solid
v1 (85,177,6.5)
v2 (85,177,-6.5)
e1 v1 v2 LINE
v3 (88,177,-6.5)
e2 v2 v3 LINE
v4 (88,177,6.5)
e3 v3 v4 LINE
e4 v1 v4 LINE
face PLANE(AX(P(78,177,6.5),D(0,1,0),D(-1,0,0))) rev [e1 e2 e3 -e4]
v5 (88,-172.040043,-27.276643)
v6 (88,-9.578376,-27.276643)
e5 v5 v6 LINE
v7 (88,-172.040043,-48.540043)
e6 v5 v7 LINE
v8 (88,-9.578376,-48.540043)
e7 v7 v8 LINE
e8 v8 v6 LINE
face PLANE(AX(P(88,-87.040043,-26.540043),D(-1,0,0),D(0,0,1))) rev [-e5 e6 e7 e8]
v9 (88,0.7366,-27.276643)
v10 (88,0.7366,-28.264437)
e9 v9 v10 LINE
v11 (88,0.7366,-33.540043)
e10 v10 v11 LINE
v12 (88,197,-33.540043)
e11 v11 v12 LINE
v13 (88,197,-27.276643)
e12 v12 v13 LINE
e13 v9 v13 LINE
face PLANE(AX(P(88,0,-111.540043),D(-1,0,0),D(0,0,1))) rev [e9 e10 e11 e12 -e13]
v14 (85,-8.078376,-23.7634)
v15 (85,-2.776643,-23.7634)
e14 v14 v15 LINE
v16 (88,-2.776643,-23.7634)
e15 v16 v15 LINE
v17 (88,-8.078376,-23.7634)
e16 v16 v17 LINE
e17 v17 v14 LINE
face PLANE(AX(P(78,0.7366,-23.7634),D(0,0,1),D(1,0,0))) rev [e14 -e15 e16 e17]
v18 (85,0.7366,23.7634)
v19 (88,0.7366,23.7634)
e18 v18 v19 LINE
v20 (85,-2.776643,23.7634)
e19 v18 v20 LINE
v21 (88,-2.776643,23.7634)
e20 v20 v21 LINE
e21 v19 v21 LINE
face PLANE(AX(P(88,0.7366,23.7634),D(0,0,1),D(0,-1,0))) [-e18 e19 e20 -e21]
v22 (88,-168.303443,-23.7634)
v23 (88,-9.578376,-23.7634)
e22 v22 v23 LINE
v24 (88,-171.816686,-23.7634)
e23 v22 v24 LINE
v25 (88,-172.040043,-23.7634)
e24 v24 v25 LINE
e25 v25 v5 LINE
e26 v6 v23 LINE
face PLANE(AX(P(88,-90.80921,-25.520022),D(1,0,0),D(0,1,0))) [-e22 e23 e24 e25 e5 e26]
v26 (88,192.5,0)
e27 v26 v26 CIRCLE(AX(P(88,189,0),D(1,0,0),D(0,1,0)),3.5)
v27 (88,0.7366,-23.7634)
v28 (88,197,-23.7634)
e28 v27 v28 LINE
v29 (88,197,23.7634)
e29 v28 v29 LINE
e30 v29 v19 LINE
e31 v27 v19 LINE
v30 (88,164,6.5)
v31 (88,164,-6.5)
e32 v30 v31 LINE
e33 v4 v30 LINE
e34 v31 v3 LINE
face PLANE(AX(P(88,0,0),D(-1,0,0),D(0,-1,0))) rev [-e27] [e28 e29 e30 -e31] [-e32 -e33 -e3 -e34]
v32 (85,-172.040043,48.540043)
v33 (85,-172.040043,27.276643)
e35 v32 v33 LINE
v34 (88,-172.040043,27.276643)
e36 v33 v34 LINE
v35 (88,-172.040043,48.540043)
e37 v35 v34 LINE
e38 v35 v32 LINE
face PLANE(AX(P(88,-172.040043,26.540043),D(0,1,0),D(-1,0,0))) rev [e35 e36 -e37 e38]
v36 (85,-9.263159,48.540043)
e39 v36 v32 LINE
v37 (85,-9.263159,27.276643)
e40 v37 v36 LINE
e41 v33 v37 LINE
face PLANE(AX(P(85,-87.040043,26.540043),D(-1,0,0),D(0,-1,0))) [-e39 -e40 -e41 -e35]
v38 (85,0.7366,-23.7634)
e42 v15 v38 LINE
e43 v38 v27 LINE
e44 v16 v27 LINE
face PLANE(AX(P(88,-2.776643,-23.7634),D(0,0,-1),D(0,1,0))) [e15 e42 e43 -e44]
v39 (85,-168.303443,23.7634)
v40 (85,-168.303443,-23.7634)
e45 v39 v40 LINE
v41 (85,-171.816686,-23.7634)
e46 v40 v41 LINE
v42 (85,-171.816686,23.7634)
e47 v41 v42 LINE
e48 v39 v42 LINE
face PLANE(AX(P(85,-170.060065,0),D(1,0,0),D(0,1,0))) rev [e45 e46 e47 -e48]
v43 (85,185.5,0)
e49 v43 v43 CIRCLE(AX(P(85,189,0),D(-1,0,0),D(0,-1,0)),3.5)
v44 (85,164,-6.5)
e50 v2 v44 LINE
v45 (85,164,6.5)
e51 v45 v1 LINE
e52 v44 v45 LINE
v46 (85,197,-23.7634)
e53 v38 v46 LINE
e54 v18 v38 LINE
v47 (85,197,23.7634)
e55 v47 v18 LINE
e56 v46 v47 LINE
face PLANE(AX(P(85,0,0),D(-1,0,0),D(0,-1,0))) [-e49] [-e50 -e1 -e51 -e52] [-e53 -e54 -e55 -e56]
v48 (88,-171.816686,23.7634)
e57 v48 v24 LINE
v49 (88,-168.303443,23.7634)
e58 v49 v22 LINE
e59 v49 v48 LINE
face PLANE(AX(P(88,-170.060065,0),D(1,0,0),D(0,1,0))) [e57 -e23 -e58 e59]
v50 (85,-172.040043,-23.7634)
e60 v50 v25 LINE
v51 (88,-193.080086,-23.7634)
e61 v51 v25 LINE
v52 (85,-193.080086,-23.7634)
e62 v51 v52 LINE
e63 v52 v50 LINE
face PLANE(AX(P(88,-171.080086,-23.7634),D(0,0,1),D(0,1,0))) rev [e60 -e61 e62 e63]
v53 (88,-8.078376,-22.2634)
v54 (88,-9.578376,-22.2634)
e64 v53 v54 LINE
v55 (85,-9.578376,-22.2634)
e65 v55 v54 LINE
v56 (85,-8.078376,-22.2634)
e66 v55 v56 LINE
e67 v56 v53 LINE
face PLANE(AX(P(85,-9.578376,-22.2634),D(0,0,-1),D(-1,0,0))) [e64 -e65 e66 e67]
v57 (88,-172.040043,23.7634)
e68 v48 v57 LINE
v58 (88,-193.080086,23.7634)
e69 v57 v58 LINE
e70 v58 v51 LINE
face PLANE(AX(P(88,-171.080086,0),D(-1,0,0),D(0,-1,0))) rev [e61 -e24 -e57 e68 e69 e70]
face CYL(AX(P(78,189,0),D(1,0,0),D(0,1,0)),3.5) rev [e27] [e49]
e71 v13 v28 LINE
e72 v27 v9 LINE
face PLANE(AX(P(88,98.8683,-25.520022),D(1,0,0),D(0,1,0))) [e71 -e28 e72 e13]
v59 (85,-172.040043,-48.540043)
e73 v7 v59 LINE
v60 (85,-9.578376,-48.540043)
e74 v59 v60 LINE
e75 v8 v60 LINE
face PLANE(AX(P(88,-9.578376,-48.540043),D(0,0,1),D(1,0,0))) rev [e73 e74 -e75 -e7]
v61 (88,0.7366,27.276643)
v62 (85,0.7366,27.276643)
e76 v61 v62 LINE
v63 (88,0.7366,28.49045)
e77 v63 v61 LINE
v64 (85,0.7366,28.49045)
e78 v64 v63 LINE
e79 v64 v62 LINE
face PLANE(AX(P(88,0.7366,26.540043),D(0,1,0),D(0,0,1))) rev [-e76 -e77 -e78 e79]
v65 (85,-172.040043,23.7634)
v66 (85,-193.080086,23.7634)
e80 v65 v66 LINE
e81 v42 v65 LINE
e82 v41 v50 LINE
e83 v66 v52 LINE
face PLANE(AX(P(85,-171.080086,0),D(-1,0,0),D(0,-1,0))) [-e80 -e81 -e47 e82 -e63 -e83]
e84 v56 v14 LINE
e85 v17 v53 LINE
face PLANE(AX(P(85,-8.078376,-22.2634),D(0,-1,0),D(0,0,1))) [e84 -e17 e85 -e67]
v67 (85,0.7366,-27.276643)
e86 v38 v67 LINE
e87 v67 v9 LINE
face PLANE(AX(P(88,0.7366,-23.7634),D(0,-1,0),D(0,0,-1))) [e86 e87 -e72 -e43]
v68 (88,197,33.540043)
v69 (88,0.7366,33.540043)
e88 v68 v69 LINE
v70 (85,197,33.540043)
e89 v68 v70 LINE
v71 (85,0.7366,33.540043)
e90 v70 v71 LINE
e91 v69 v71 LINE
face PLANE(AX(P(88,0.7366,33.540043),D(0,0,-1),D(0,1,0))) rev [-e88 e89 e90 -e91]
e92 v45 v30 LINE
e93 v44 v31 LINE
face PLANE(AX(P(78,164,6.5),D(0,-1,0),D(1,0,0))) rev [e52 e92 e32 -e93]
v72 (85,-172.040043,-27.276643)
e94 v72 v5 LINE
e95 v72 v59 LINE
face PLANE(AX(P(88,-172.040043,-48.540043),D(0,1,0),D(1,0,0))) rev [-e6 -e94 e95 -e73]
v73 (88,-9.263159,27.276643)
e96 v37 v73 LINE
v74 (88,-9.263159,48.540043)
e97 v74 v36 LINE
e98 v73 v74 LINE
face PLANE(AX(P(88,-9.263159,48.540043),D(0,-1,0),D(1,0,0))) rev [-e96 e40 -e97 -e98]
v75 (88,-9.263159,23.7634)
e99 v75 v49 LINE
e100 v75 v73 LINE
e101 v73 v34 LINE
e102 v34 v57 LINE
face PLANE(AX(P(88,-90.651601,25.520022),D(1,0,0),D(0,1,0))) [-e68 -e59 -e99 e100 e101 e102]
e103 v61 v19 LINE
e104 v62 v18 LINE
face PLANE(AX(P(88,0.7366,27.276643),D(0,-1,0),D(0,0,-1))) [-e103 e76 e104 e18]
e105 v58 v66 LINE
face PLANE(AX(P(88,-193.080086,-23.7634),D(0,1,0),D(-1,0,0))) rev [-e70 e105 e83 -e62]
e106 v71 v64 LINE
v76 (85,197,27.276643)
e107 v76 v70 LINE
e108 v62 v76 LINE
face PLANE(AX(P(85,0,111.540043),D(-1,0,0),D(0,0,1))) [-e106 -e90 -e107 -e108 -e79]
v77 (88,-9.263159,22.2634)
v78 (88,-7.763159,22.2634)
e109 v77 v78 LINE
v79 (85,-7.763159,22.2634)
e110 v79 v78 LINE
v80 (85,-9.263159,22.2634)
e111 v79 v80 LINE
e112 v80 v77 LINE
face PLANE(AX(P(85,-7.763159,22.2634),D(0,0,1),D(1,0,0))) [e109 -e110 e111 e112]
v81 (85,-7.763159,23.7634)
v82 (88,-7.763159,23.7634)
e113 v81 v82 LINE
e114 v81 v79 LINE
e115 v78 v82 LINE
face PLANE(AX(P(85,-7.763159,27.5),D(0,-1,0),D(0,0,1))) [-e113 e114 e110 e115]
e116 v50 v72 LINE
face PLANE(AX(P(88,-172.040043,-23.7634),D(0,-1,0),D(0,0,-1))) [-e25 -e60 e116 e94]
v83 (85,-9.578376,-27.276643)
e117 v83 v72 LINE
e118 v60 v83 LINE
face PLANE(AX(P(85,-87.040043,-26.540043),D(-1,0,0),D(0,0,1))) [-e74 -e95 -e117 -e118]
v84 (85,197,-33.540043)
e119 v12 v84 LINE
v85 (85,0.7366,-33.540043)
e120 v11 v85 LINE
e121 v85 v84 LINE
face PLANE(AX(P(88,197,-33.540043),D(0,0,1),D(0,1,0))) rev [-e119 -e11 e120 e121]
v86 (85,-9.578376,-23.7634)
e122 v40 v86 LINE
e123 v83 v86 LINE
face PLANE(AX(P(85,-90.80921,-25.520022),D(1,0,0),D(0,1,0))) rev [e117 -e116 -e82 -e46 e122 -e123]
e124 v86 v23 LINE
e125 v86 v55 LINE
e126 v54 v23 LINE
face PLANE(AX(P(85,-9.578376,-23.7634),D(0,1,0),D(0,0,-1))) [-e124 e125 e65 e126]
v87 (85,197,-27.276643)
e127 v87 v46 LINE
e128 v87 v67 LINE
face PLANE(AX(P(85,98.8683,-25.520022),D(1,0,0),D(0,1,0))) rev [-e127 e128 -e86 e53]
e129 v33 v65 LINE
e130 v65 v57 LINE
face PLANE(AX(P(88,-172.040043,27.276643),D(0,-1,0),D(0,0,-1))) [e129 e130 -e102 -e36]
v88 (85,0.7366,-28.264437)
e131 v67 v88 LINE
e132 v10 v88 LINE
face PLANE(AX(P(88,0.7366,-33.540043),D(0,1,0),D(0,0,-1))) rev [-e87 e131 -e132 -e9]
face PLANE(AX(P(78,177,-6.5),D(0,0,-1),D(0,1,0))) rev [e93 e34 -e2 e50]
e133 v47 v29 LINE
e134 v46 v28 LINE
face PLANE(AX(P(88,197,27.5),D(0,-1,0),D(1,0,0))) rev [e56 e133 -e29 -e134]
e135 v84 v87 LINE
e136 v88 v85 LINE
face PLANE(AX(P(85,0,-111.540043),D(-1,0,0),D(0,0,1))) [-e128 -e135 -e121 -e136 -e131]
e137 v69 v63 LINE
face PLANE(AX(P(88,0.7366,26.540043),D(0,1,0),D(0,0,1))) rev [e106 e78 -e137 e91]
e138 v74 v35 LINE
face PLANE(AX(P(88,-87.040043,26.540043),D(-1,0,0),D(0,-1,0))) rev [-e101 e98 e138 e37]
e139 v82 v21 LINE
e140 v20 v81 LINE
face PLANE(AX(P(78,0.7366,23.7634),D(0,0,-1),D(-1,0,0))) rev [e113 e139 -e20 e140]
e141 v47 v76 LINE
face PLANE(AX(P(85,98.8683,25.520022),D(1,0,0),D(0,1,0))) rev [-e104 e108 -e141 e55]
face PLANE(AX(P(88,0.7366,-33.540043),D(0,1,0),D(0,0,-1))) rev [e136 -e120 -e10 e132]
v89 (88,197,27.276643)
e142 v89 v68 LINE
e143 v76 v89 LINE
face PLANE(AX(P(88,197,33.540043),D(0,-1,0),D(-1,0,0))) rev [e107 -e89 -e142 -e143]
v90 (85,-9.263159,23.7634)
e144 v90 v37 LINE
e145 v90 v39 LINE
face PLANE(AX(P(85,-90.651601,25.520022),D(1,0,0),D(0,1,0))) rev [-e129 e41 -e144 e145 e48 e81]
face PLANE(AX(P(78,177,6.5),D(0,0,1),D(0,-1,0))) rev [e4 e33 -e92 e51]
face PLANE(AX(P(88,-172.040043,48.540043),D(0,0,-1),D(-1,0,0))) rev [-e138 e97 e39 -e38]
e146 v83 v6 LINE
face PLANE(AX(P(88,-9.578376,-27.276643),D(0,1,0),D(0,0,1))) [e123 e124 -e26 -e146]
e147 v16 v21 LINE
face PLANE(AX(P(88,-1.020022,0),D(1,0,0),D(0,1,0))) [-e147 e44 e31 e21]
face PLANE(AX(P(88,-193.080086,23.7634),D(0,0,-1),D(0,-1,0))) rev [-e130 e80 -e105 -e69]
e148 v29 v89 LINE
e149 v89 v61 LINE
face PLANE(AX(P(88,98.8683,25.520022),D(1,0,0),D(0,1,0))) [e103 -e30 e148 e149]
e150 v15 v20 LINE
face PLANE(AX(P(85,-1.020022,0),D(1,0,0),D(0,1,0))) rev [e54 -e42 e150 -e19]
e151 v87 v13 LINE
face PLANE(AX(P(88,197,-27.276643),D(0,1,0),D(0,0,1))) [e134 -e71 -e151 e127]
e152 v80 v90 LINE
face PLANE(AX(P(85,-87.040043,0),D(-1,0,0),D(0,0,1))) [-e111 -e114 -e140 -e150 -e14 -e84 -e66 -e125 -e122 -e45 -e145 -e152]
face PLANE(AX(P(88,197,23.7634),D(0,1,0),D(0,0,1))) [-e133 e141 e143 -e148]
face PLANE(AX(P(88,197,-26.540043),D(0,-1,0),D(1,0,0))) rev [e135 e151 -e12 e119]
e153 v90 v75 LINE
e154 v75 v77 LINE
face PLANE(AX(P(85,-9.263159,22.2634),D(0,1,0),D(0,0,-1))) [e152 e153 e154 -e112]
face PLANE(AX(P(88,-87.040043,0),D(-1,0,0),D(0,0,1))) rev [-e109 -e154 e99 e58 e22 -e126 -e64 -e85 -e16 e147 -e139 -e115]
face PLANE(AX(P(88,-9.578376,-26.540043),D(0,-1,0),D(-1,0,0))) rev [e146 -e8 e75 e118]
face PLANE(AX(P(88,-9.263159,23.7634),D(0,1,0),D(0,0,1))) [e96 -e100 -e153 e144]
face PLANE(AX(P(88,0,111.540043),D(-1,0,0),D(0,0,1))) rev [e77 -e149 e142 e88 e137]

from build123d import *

# Parameters (mm, degrees)
SKETCH1_W                     = 170
SKETCH1_H                     = 55
BASE_FLANGE1_DEPTH            = 3
EDGE_FLANGE1_STRIP_W          = 13.4732
EDGE_FLANGE1_STRIP_H          = 3
EDGE_FLANGE1_STRIP_CUT_DEPTH  = 162.776884107
EDGE_FLANGE1_RELIEF_W         = 14.9732
EDGE_FLANGE1_RELIEF_H         = 1.5
EDGE_FLANGE1_RELIEF_CUT_DEPTH = 3
EDGE_FLANGE1_DEPTH            = 162.776884107
EDGE_FLANGE2_STRIP_W          = 13.4732
EDGE_FLANGE2_STRIP_H          = 3
EDGE_FLANGE2_STRIP_CUT_DEPTH  = 162.461666913
EDGE_FLANGE2_RELIEF_W         = 14.9732
EDGE_FLANGE2_RELIEF_H         = 1.5
EDGE_FLANGE2_RELIEF_CUT_DEPTH = 3
EDGE_FLANGE2_DEPTH            = 162.461666913
EDGE_FLANGE3_STRIP_W          = 13.4732
EDGE_FLANGE3_STRIP_H          = 3
EDGE_FLANGE3_STRIP_CUT_DEPTH  = 47.5268
EDGE_FLANGE3_DEPTH            = 47.5268
EDGE_FLANGE4_STRIP_W          = 13.4732
EDGE_FLANGE4_STRIP_H          = 3
EDGE_FLANGE4_STRIP_CUT_DEPTH  = 55
EDGE_FLANGE4_DEPTH            = 55
EDGE_FLANGE5_STRIP_W          = 13.4732
EDGE_FLANGE5_STRIP_H          = 3
EDGE_FLANGE5_STRIP_CUT_DEPTH  = 196.2634
EDGE_FLANGE5_DEPTH            = 196.2634
EDGE_FLANGE6_STRIP_W          = 13.4732
EDGE_FLANGE6_STRIP_H          = 3
EDGE_FLANGE6_STRIP_CUT_DEPTH  = 196.2634
EDGE_FLANGE6_DEPTH            = 196.2634
SKETCH27_R                    = 3.5
SKETCH27_W                    = 13
SKETCH27_H                    = 13
CUT_EXTRUDE1_DEPTH            = 10
UNFOLD1_START                 = -85
UNFOLD1_DEPTH                 = 170
UNFOLD1_START_2               = 85
UNFOLD1_2_DEPTH               = 3
SKETCH28_W                    = 4.727050269
SKETCH28_H                    = 8.499758958
CUT_EXTRUDE2_DEPTH            = 10
SKETCH29_W                    = 4.501036857
SKETCH29_H                    = 9.383895171
CUT_EXTRUDE3_DEPTH            = 10
FOLD2_START                   = -193.080086129
FOLD2_OUTLINE_W               = 3
FOLD2_OUTLINE_H               = 97.08008613
FOLD2_DEPTH                   = 190.080086129
FOLD2_START_2                 = 0.7366
FOLD2_2_DEPTH                 = 196.2634
FOLD2_START_3                 = -2.776643065
FOLD2_3_DEPTH                 = 2.776643065
FOLD2_4_OUTLINE_W             = 162.776884107
FOLD2_4_OUTLINE_H             = 3
FOLD2_4_OUTLINE_W_2           = 162.461666913
FOLD2_4_DEPTH                 = 21.2634
FOLD2_START_4                 = 22
FOLD2_5_DEPTH                 = 175
FOLD2_START_5                 = 87.103787073
FOLD2_6_OUTLINE_W             = 0.223356935
FOLD2_6_OUTLINE_H             = 47.5268
FOLD2_6_DEPTH                 = 1.896212927
FOLD2_START_6                 = -85
FOLD2_7_DEPTH                 = 162.461666913
FOLD2_START_7                 = -106.040043065
FOLD2_8_OUTLINE_W             = 0.223356935
FOLD2_8_OUTLINE_H             = 47.5268
FOLD2_8_DEPTH                 = 21.040043065
FOLD2_START_8                 = 79.276884107
FOLD2_9_OUTLINE_W             = 0.223356935
FOLD2_9_OUTLINE_H             = 47.5268
FOLD2_9_DEPTH                 = 4.986515893
FOLD2_START_9                 = 77.461666913
FOLD2_10_DEPTH                = 0.315217194
FOLD2_START_10                = -23.7634
FOLD2_11_DEPTH                = 47.5268
FOLD2_START_11                = -22.2634
FOLD2_12_OUTLINE_W            = 1.815217194
FOLD2_12_OUTLINE_H            = 0.223356935
FOLD2_12_DEPTH                = 44.5268
FOLD2_13_DEPTH                = 47.5268
FOLD2_14_OUTLINE_W            = 0.315217194
FOLD2_14_OUTLINE_H            = 0.223356935
FOLD2_14_DEPTH                = 46.0268
FOLD2_15_OUTLINE_W            = 0.315217194
FOLD2_15_OUTLINE_H            = 0.223356935
FOLD2_15_DEPTH                = 46.0268
FOLD3_START                   = -23.7634
FOLD3_DEPTH                   = 47.5268
FOLD3_2_DEPTH                 = 47.5268
UNFOLD2_START                 = -85
UNFOLD2_DEPTH                 = 170
UNFOLD2_START_2               = 85
UNFOLD2_2_OUTLINE_W           = 196.2634
UNFOLD2_2_OUTLINE_H           = 9.776643065
UNFOLD2_2_DEPTH               = 3


with BuildPart() as part:
    # Base-Flange1: sheet metal written as solids
    # Sketch1 → Base-Flange1 (new body)
    with BuildSketch(Plane(origin=(0, 0, 0), x_dir=(1, 0, 0), z_dir=(0, 1, 0))):
        Rectangle(SKETCH1_W, SKETCH1_H)
    extrude(amount=-BASE_FLANGE1_DEPTH)

    # Edge-Flange1: sheet metal written as solids
    # Edge-Flange1 strip (on a plane across the edge) → Edge-Flange1 strip cut (cut)
    with BuildSketch(Plane(origin=(-85, 0, 27.5), x_dir=(0, 0, -1), z_dir=(1, 0, 0))):
        with Locations((-3, -1.5)):
            Rectangle(EDGE_FLANGE1_STRIP_W, EDGE_FLANGE1_STRIP_H)
    extrude(amount=EDGE_FLANGE1_STRIP_CUT_DEPTH, mode=Mode.SUBTRACT)

    # Edge-Flange1 relief (on the sheet) → Edge-Flange1 relief cut (cut)
    with BuildSketch(Plane(origin=(-85, 0, 23.7634), x_dir=(0, 0, -1), z_dir=(0, 1, 0))):
        with Locations((-5.9866, -163.526884107)):
            Rectangle(EDGE_FLANGE1_RELIEF_W, EDGE_FLANGE1_RELIEF_H)
    extrude(amount=-EDGE_FLANGE1_RELIEF_CUT_DEPTH, mode=Mode.SUBTRACT)

    # Edge-Flange1 section (on a plane across the edge) → Edge-Flange1 (add)
    with BuildSketch(Plane(origin=(-85, 0, 27.5), x_dir=(0, 0, -1), z_dir=(1, 0, 0))):
        with BuildLine():
            Line((0, 0.7366), (0, 22))
            Line((0, 22), (3, 22))
            Line((3, 22), (3, 0.7366))
            ThreePointArc((3, 0.7366), (3.215745145, 0.215745145), (3.7366, 0))
            Line((3.7366, 0), (3.7366, -3))
            ThreePointArc((3.7366, -3), (1.094424801, -1.905575199), (0, 0.7366))
        make_face()
    extrude(amount=EDGE_FLANGE1_DEPTH)

    # Edge-Flange2: sheet metal written as solids
    # Edge-Flange2 strip (on a plane across the edge) → Edge-Flange2 strip cut (cut)
    with BuildSketch(Plane(origin=(77.461666913, 0, -27.5), x_dir=(0, 0, 1), z_dir=(-1, 0, 0))):
        with Locations((-3, -1.5)):
            Rectangle(EDGE_FLANGE2_STRIP_W, EDGE_FLANGE2_STRIP_H)
    extrude(amount=EDGE_FLANGE2_STRIP_CUT_DEPTH, mode=Mode.SUBTRACT)

    # Edge-Flange2 relief (on the sheet) → Edge-Flange2 relief cut (cut)
    with BuildSketch(Plane(origin=(77.461666913, 0, -23.7634), x_dir=(0, 0, 1), z_dir=(0, 1, 0))):
        with Locations((-5.9866, 0.75)):
            Rectangle(EDGE_FLANGE2_RELIEF_W, EDGE_FLANGE2_RELIEF_H)
    extrude(amount=-EDGE_FLANGE2_RELIEF_CUT_DEPTH, mode=Mode.SUBTRACT)

    # Edge-Flange2 section (on a plane across the edge) → Edge-Flange2 (add)
    with BuildSketch(Plane(origin=(77.461666913, 0, -27.5), x_dir=(0, 0, 1), z_dir=(-1, 0, 0))):
        with BuildLine():
            Line((0, 0.7366), (0, 22))
            Line((0, 22), (3, 22))
            Line((3, 22), (3, 0.7366))
            ThreePointArc((3, 0.7366), (3.215745145, 0.215745145), (3.7366, 0))
            Line((3.7366, 0), (3.7366, -3))
            ThreePointArc((3.7366, -3), (1.094424801, -1.905575199), (0, 0.7366))
        make_face()
    extrude(amount=EDGE_FLANGE2_DEPTH)

    # Edge-Flange3: sheet metal written as solids
    # Edge-Flange3 strip (on a plane across the edge) → Edge-Flange3 strip cut (cut)
    with BuildSketch(Plane(origin=(-85, 0, -23.7634), x_dir=(1, 0, 0), z_dir=(0, 0, 1))):
        with Locations((-3, -1.5)):
            Rectangle(EDGE_FLANGE3_STRIP_W, EDGE_FLANGE3_STRIP_H)
    extrude(amount=EDGE_FLANGE3_STRIP_CUT_DEPTH, mode=Mode.SUBTRACT)

    # Edge-Flange3 section (on a plane across the edge) → Edge-Flange3 (add)
    with BuildSketch(Plane(origin=(-85, 0, -23.7634), x_dir=(1, 0, 0), z_dir=(0, 0, 1))):
        with BuildLine():
            Line((0, 0.7366), (0, 22))
            Line((0, 22), (3, 22))
            Line((3, 22), (3, 0.7366))
            ThreePointArc((3, 0.7366), (3.215745145, 0.215745145), (3.7366, 0))
            Line((3.7366, 0), (3.7366, -3))
            ThreePointArc((3.7366, -3), (1.094424801, -1.905575199), (0, 0.7366))
        make_face()
    extrude(amount=EDGE_FLANGE3_DEPTH)

    # Edge-Flange4: sheet metal written as solids
    # Edge-Flange4 strip (on a plane across the edge) → Edge-Flange4 strip cut (cut)
    with BuildSketch(Plane(origin=(85, 0, 27.5), x_dir=(-1, 0, 0), z_dir=(0, 0, -1))):
        with Locations((-6, -1.5)):
            Rectangle(EDGE_FLANGE4_STRIP_W, EDGE_FLANGE4_STRIP_H)
    extrude(amount=EDGE_FLANGE4_STRIP_CUT_DEPTH, mode=Mode.SUBTRACT)

    # Edge-Flange4 section (on a plane across the edge) → Edge-Flange4 (add)
    with BuildSketch(Plane(origin=(85, 0, 27.5), x_dir=(-1, 0, 0), z_dir=(0, 0, -1))):
        with BuildLine():
            Line((-3, 0.7366), (-3, 197))
            Line((-3, 197), (0, 197))
            Line((0, 197), (0, 0.7366))
            ThreePointArc((0, 0.7366), (0.215745145, 0.215745145), (0.7366, 0))
            Line((0.7366, 0), (0.7366, -3))
            ThreePointArc((0.7366, -3), (-1.905575199, -1.905575199), (-3, 0.7366))
        make_face()
    extrude(amount=EDGE_FLANGE4_DEPTH)

    # Edge-Flange5: sheet metal written as solids
    # Edge-Flange5 strip (on a plane across the edge) → Edge-Flange5 strip cut (cut)
    with BuildSketch(Plane(origin=(85, 0.7366, 27.5), x_dir=(0, 0, -1), z_dir=(0, 1, 0))):
        with Locations((-3, -1.5)):
            Rectangle(EDGE_FLANGE5_STRIP_W, EDGE_FLANGE5_STRIP_H)
    extrude(amount=EDGE_FLANGE5_STRIP_CUT_DEPTH, mode=Mode.SUBTRACT)

    # Edge-Flange5 section (on a plane across the edge) → Edge-Flange5 (add)
    with BuildSketch(Plane(origin=(85, 0.7366, 27.5), x_dir=(0, 0, -1), z_dir=(0, 1, 0))):
        with BuildLine():
            Line((0, 0.7366), (0, 7))
            Line((0, 7), (3, 7))
            Line((3, 7), (3, 0.7366))
            ThreePointArc((3, 0.7366), (3.215745145, 0.215745145), (3.7366, 0))
            Line((3.7366, 0), (3.7366, -3))
            ThreePointArc((3.7366, -3), (1.094424801, -1.905575199), (0, 0.7366))
        make_face()
    extrude(amount=EDGE_FLANGE5_DEPTH)

    # Edge-Flange6: sheet metal written as solids
    # Edge-Flange6 strip (on a plane across the edge) → Edge-Flange6 strip cut (cut)
    with BuildSketch(Plane(origin=(85, 197, -27.5), x_dir=(0, 0, 1), z_dir=(0, -1, 0))):
        with Locations((-3, -1.5)):
            Rectangle(EDGE_FLANGE6_STRIP_W, EDGE_FLANGE6_STRIP_H)
    extrude(amount=EDGE_FLANGE6_STRIP_CUT_DEPTH, mode=Mode.SUBTRACT)

    # Edge-Flange6 section (on a plane across the edge) → Edge-Flange6 (add)
    with BuildSketch(Plane(origin=(85, 197, -27.5), x_dir=(0, 0, 1), z_dir=(0, -1, 0))):
        with BuildLine():
            Line((0, 0.7366), (0, 7))
            Line((0, 7), (3, 7))
            Line((3, 7), (3, 0.7366))
            ThreePointArc((3, 0.7366), (3.215745145, 0.215745145), (3.7366, 0))
            Line((3.7366, 0), (3.7366, -3))
            ThreePointArc((3.7366, -3), (1.094424801, -1.905575199), (0, 0.7366))
        make_face()
    extrude(amount=EDGE_FLANGE6_DEPTH)

    # Sketch27 → Cut-Extrude1 (cut)
    with BuildSketch(Plane(origin=(88, 0, 0), x_dir=(0, 0, -1), z_dir=(1, 0, 0))):
        with Locations(Location((0, 189, 0), (0, 0, 90))):
            Circle(SKETCH27_R)
        with Locations((0, 170.5)):
            Rectangle(SKETCH27_W, SKETCH27_H)
    extrude(amount=-CUT_EXTRUDE1_DEPTH, mode=Mode.SUBTRACT)

    # Unfold1: read off the stored shape, not the designer's step
    # Unfold1 outline → Unfold1 (cut)
    with BuildSketch(Plane.YZ.offset(UNFOLD1_START)):
        Polygon((197, -27.5), (197, -23.7634), (22, -23.7634), (22, 23.7634), (197, 23.7634), (197, 27.5), (-7.763158958, 27.5), (-7.763158958, 22.2634), (-9.263158958, 22.2634), (-9.263158958, 23.7634), (-168.303443065, 23.7634), (-168.303443065, -23.7634), (-9.578376152, -23.7634), (-9.578376152, -22.2634), (-8.078376152, -22.2634), (-8.078376152, -27.5), align=None)
    extrude(amount=UNFOLD1_DEPTH, mode=Mode.SUBTRACT)

    # Unfold1 2 outline → Unfold1 2 (add)
    with BuildSketch(Plane.YZ.offset(UNFOLD1_START_2)):
        Polygon((0.7366, -27.5), (0.7366, -33.540043065), (197, -33.540043065), (197, -23.7634), (0.7366, -23.7634), (0.7366, 23.7634), (197, 23.7634), (197, 33.540043065), (0.7366, 33.540043065), (0.7366, 27.5), (-7.763158958, 27.5), (-7.763158958, 22.2634), (-9.263158958, 22.2634), (-9.263158958, 48.540043065), (-172.040043065, 48.540043065), (-172.040043065, 23.7634), (-193.080086129, 23.7634), (-193.080086129, -23.7634), (-172.040043065, -23.7634), (-172.040043065, -48.540043065), (-9.578376152, -48.540043065), (-9.578376152, -22.2634), (-8.078376152, -22.2634), (-8.078376152, -27.5), align=None)
    extrude(amount=UNFOLD1_2_DEPTH)

    # Sketch28 → Cut-Extrude2 (cut)
    with BuildSketch(Plane(origin=(88, 0, 0), x_dir=(0, 0, -1), z_dir=(1, 0, 0))):
        with Locations((-26.126925134, -3.513279479)):
            Rectangle(SKETCH28_W, SKETCH28_H)
    extrude(amount=-CUT_EXTRUDE2_DEPTH, mode=Mode.SUBTRACT)

    # Sketch29 → Cut-Extrude3 (cut)
    with BuildSketch(Plane(origin=(88, 0, 0), x_dir=(0, 0, -1), z_dir=(1, 0, 0))):
        with Locations((26.013918429, -3.955347585)):
            Rectangle(SKETCH29_W, SKETCH29_H)
    extrude(amount=-CUT_EXTRUDE3_DEPTH, mode=Mode.SUBTRACT)

    # Fold2: read off the stored shape, not the designer's step
    # Fold2 outline → Fold2 (cut)
    with BuildSketch(Plane(origin=(0, 0, 0), x_dir=(1, 0, 0), z_dir=(0, 1, 0)).offset(FOLD2_START)):
        with Locations((86.5, 0)):
            Rectangle(FOLD2_OUTLINE_W, FOLD2_OUTLINE_H)
    extrude(amount=FOLD2_DEPTH, mode=Mode.SUBTRACT)

    # Fold2 2 outline → Fold2 2 (cut)
    with BuildSketch(Plane(origin=(0, 0, 0), x_dir=(1, 0, 0), z_dir=(0, 1, 0)).offset(FOLD2_START_2)):
        with BuildLine():
            Line((88, -33.540043065), (88, -23.7634))
            ThreePointArc((88, -23.7634), (87.154295979, -26.130867001), (85, -27.426677222))
            Line((85, -27.426677222), (85, -33.540043065))
            Line((85, -33.540043065), (88, -33.540043065))
        make_face()
        with BuildLine():
            ThreePointArc((85, 27.426677222), (87.154295979, 26.130867001), (88, 23.7634))
            Line((88, 23.7634), (88, 33.540043065))
            Line((88, 33.540043065), (85, 33.540043065))
            Line((85, 33.540043065), (85, 27.426677222))
        make_face()
    extrude(amount=FOLD2_2_DEPTH, mode=Mode.SUBTRACT)

    # Fold2 3 outline → Fold2 3 (add)
    with BuildSketch(Plane(origin=(0, 0, 0), x_dir=(1, 0, 0), z_dir=(0, 1, 0)).offset(FOLD2_START_3)):
        Polygon((77.776884107, -22.2634), (79.276884107, -22.2634), (79.276884107, -23.7634), (85, -23.7634), (85, 23.7634), (78.961666913, 23.7634), (78.961666913, 22.2634), (77.461666913, 22.2634), (77.461666913, 24.5), (-85, 24.5), (-85, 23.7634), (-106.040043065, 23.7634), (-106.040043065, -23.7634), (-85, -23.7634), (-85, -24.5), (77.776884107, -24.5), align=None)
    extrude(amount=FOLD2_3_DEPTH)

    # Fold2 4 outline → Fold2 4 (add)
    with BuildSketch(Plane(origin=(0, 0, 0), x_dir=(1, 0, 0), z_dir=(0, 1, 0)).offset(FOLD2_START_2)):
        with BuildLine():
            Line((85, -27.426677222), (85, -23.7634))
            ThreePointArc((85, -23.7634), (84.784254855, -24.284254855), (84.2634, -24.5))
            Line((84.2634, -24.5), (78, -24.5))
            Line((78, -24.5), (78, -27.5))
            Line((78, -27.5), (84.2634, -27.5))
            ThreePointArc((84.2634, -27.5), (84.63352018, -27.481624121), (85, -27.426677222))
        make_face()
        with Locations((-3.611557946, -26)):
            Rectangle(FOLD2_4_OUTLINE_W, FOLD2_4_OUTLINE_H)
        with BuildLine():
            ThreePointArc((84.2634, 24.5), (84.784254855, 24.284254855), (85, 23.7634))
            Line((85, 23.7634), (85, 27.426677222))
            ThreePointArc((85, 27.426677222), (84.63352018, 27.481624121), (84.2634, 27.5))
            Line((84.2634, 27.5), (78, 27.5))
            Line((78, 27.5), (78, 24.5))
            Line((78, 24.5), (84.2634, 24.5))
        make_face()
        with Locations((-3.769166543, 26)):
            Rectangle(FOLD2_4_OUTLINE_W_2, FOLD2_4_OUTLINE_H)
    extrude(amount=FOLD2_4_DEPTH)

    # Fold2 5 outline → Fold2 5 (add)
    with BuildSketch(Plane(origin=(0, 0, 0), x_dir=(1, 0, 0), z_dir=(0, 1, 0)).offset(FOLD2_START_4)):
        with BuildLine():
            Line((85, -27.426677222), (85, -23.7634))
            ThreePointArc((85, -23.7634), (84.784254855, -24.284254855), (84.2634, -24.5))
            Line((84.2634, -24.5), (78, -24.5))
            Line((78, -24.5), (78, -27.5))
            Line((78, -27.5), (84.2634, -27.5))
            ThreePointArc((84.2634, -27.5), (84.63352018, -27.481624121), (85, -27.426677222))
        make_face()
        with BuildLine():
            ThreePointArc((84.2634, 24.5), (84.784254855, 24.284254855), (85, 23.7634))
            Line((85, 23.7634), (85, 27.426677222))
            ThreePointArc((85, 27.426677222), (84.63352018, 27.481624121), (84.2634, 27.5))
            Line((84.2634, 27.5), (78, 27.5))
            Line((78, 27.5), (78, 24.5))
            Line((78, 24.5), (84.2634, 24.5))
        make_face()
    extrude(amount=FOLD2_5_DEPTH)

    # Fold2 6 outline → Fold2 6 (cut)
    with BuildSketch(Plane.YZ.offset(FOLD2_START_5)):
        with Locations((-2.888321533, 0)):
            Rectangle(FOLD2_6_OUTLINE_W, FOLD2_6_OUTLINE_H)
    extrude(amount=FOLD2_6_DEPTH, mode=Mode.SUBTRACT)

    # Fold2 7 outline → Fold2 7 (add)
    with BuildSketch(Plane.YZ.offset(FOLD2_START_6)):
        with BuildLine():
            Line((0, -23.7634), (-2.776643065, -23.7634))
            Line((-2.776643065, -23.7634), (-2.776643065, 23.7634))
            Line((-2.776643065, 23.7634), (0, 23.7634))
            ThreePointArc((0, 23.7634), (0.215745145, 24.284254855), (0.7366, 24.5))
            Line((0.7366, 24.5), (0.7366, 27.5))
            ThreePointArc((0.7366, 27.5), (-1.905575199, 26.405575199), (-3, 23.7634))
            Line((-3, 23.7634), (-3, -23.7634))
            ThreePointArc((-3, -23.7634), (-1.905575199, -26.405575199), (0.7366, -27.5))
            Line((0.7366, -27.5), (0.7366, -24.5))
            ThreePointArc((0.7366, -24.5), (0.215745145, -24.284254855), (0, -23.7634))
        make_face()
    extrude(amount=FOLD2_7_DEPTH)

    # Fold2 8 outline → Fold2 8 (add)
    with BuildSketch(Plane.YZ.offset(FOLD2_START_7)):
        with Locations((-2.888321533, 0)):
            Rectangle(FOLD2_8_OUTLINE_W, FOLD2_8_OUTLINE_H)
    extrude(amount=FOLD2_8_DEPTH)

    # Fold2 9 outline → Fold2 9 (add)
    with BuildSketch(Plane.YZ.offset(FOLD2_START_8)):
        with Locations((-2.888321533, 0)):
            Rectangle(FOLD2_9_OUTLINE_W, FOLD2_9_OUTLINE_H)
    extrude(amount=FOLD2_9_DEPTH)

    # Fold2 10 outline → Fold2 10 (add)
    with BuildSketch(Plane.YZ.offset(FOLD2_START_9)):
        with BuildLine():
            ThreePointArc((0.7366, 27.5), (-1.905575199, 26.405575199), (-3, 23.7634))
            Line((-3, 23.7634), (-2.776643065, 23.7634))
            Line((-2.776643065, 23.7634), (0, 23.7634))
            ThreePointArc((0, 23.7634), (0.215745145, 24.284254855), (0.7366, 24.5))
            Line((0.7366, 24.5), (0.7366, 27.5))
        make_face()
    extrude(amount=FOLD2_10_DEPTH)

    # Fold2 11 outline → Fold2 11 (cut)
    with BuildSketch(Plane.XY.offset(FOLD2_START_10)):
        with BuildLine():
            Line((88, -2.776643065), (88, 0.7366))
            ThreePointArc((88, 0.7366), (87.154295979, -1.630867001), (85, -2.926677222))
            Line((85, -2.926677222), (85, -3))
            Line((85, -3), (87.103787073, -3))
            Line((87.103787073, -3), (87.103787073, -2.776643065))
            Line((87.103787073, -2.776643065), (88, -2.776643065))
        make_face()
    extrude(amount=FOLD2_11_DEPTH, mode=Mode.SUBTRACT)

    # Fold2 12 outline → Fold2 12 (add)
    with BuildSketch(Plane.XY.offset(FOLD2_START_11)):
        with BuildLine():
            ThreePointArc((85, 0.7366), (84.784254855, 0.215745145), (84.2634, 0))
            Line((84.2634, 0), (85, 0))
            Line((85, 0), (85, 0.7366))
        make_face()
        with Locations((78.36927551, -2.888321533)):
            Rectangle(FOLD2_12_OUTLINE_W, FOLD2_12_OUTLINE_H)
        with BuildLine():
            ThreePointArc((84.2634, -3), (84.63352018, -2.981624121), (85, -2.926677222))
            Line((85, -2.926677222), (85, -2.776643065))
            Line((85, -2.776643065), (84.2634, -2.776643065))
            Line((84.2634, -2.776643065), (84.2634, -3))
        make_face()
    extrude(amount=FOLD2_12_DEPTH)

    # Fold2 13 outline → Fold2 13 (add)
    with BuildSketch(Plane.XY.offset(FOLD2_START_10)):
        with BuildLine():
            ThreePointArc((85, 0.7366), (84.784254855, 0.215745145), (84.2634, 0))
            Line((84.2634, 0), (85, 0))
            Line((85, 0), (85, 0.7366))
        make_face()
        with BuildLine():
            ThreePointArc((84.2634, -3), (84.63352018, -2.981624121), (85, -2.926677222))
            Line((85, -2.926677222), (85, -2.776643065))
            Line((85, -2.776643065), (84.2634, -2.776643065))
            Line((84.2634, -2.776643065), (84.2634, -3))
        make_face()
    extrude(amount=FOLD2_13_DEPTH)

    # Fold2 14 outline → Fold2 14 (add)
    with BuildSketch(Plane.XY.offset(FOLD2_START_10)):
        with Locations((79.11927551, -2.888321533)):
            Rectangle(FOLD2_14_OUTLINE_W, FOLD2_14_OUTLINE_H)
    extrude(amount=FOLD2_14_DEPTH)

    # Fold2 15 outline → Fold2 15 (add)
    with BuildSketch(Plane.XY.offset(FOLD2_START_11)):
        with Locations((77.61927551, -2.888321533)):
            Rectangle(FOLD2_15_OUTLINE_W, FOLD2_15_OUTLINE_H)
    extrude(amount=FOLD2_15_DEPTH)

    # Fold3: read off the stored shape, not the designer's step
    # Fold3 outline → Fold3 (cut)
    with BuildSketch(Plane.XY.offset(FOLD3_START)):
        with BuildLine():
            ThreePointArc((-81.2634, -3), (-83.630867001, -2.154295979), (-84.926677222, 0))
            Line((-84.926677222, 0), (-106.040043065, 0))
            Line((-106.040043065, 0), (-106.040043065, -3))
            Line((-106.040043065, -3), (-81.2634, -3))
        make_face()
    extrude(amount=FOLD3_DEPTH, mode=Mode.SUBTRACT)

    # Fold3 2 outline → Fold3 2 (add)
    with BuildSketch(Plane.XY.offset(FOLD3_START)):
        with BuildLine():
            Line((-85, 22), (-85, 0.7366))
            ThreePointArc((-85, 0.7366), (-84.981624121, 0.36647982), (-84.926677222, 0))
            Line((-84.926677222, 0), (-81.2634, 0))
            ThreePointArc((-81.2634, 0), (-81.784254855, 0.215745145), (-82, 0.7366))
            Line((-82, 0.7366), (-82, 22))
            Line((-82, 22), (-85, 22))
        make_face()
    extrude(amount=FOLD3_2_DEPTH)

    # Unfold2: read off the stored shape, not the designer's step
    # Unfold2 outline → Unfold2 (cut)
    with BuildSketch(Plane.YZ.offset(UNFOLD2_START)):
        with BuildLine():
            Line((-9.578376152, -22.2634), (-8.078376152, -22.2634))
            Line((-8.078376152, -22.2634), (-8.078376152, -23.7634))
            Line((-8.078376152, -23.7634), (-3, -23.7634))
            ThreePointArc((-3, -23.7634), (-1.905575199, -26.405575199), (0.7366, -27.5))
            Line((0.7366, -27.5), (197, -27.5))
            Line((197, -27.5), (197, -23.7634))
            Line((197, -23.7634), (22, -23.7634))
            Line((22, -23.7634), (22, 23.7634))
            Line((22, 23.7634), (197, 23.7634))
            Line((197, 23.7634), (197, 27.5))
            Line((197, 27.5), (0.7366, 27.5))
            ThreePointArc((0.7366, 27.5), (-1.905575199, 26.405575199), (-3, 23.7634))
            Line((-3, 23.7634), (-7.763158958, 23.7634))
            Line((-7.763158958, 23.7634), (-7.763158958, 22.2634))
            Line((-7.763158958, 22.2634), (-9.263158958, 22.2634))
            Line((-9.263158958, 22.2634), (-9.263158958, 23.7634))
            Line((-9.263158958, 23.7634), (-168.303443065, 23.7634))
            Line((-168.303443065, 23.7634), (-168.303443065, -23.7634))
            Line((-168.303443065, -23.7634), (-9.578376152, -23.7634))
            Line((-9.578376152, -23.7634), (-9.578376152, -22.2634))
        make_face()
        with BuildLine():
            Line((0.7366, 23.7634), (0, 23.7634))
            ThreePointArc((0, 23.7634), (0.215745145, 24.284254855), (0.7366, 24.5))
            Line((0.7366, 24.5), (0.7366, 23.7634))
        make_face(mode=Mode.SUBTRACT)
        with BuildLine():
            Line((0, -23.7634), (0.7366, -23.7634))
            Line((0.7366, -23.7634), (0.7366, -24.5))
            ThreePointArc((0.7366, -24.5), (0.215745145, -24.284254855), (0, -23.7634))
        make_face(mode=Mode.SUBTRACT)
    extrude(amount=UNFOLD2_DEPTH, mode=Mode.SUBTRACT)

    # Unfold2 2 outline → Unfold2 2 (add)
    with BuildSketch(Plane.YZ.offset(UNFOLD2_START_2)):
        Polygon((-9.578376152, -22.2634), (-8.078376152, -22.2634), (-8.078376152, -23.7634), (0.7366, -23.7634), (0.7366, 23.7634), (-7.763158958, 23.7634), (-7.763158958, 22.2634), (-9.263158958, 22.2634), (-9.263158958, 48.540043065), (-172.040043065, 48.540043065), (-172.040043065, 23.7634), (-193.080086129, 23.7634), (-193.080086129, -23.7634), (-172.040043065, -23.7634), (-172.040043065, -48.540043065), (-9.578376152, -48.540043065), align=None)
        with Locations((98.8683, -28.651721532)):
            Rectangle(UNFOLD2_2_OUTLINE_W, UNFOLD2_2_OUTLINE_H)
        with Locations((98.8683, 28.651721532)):
            Rectangle(UNFOLD2_2_OUTLINE_W, UNFOLD2_2_OUTLINE_H)
    extrude(amount=UNFOLD2_2_DEPTH)


solid = part.part
